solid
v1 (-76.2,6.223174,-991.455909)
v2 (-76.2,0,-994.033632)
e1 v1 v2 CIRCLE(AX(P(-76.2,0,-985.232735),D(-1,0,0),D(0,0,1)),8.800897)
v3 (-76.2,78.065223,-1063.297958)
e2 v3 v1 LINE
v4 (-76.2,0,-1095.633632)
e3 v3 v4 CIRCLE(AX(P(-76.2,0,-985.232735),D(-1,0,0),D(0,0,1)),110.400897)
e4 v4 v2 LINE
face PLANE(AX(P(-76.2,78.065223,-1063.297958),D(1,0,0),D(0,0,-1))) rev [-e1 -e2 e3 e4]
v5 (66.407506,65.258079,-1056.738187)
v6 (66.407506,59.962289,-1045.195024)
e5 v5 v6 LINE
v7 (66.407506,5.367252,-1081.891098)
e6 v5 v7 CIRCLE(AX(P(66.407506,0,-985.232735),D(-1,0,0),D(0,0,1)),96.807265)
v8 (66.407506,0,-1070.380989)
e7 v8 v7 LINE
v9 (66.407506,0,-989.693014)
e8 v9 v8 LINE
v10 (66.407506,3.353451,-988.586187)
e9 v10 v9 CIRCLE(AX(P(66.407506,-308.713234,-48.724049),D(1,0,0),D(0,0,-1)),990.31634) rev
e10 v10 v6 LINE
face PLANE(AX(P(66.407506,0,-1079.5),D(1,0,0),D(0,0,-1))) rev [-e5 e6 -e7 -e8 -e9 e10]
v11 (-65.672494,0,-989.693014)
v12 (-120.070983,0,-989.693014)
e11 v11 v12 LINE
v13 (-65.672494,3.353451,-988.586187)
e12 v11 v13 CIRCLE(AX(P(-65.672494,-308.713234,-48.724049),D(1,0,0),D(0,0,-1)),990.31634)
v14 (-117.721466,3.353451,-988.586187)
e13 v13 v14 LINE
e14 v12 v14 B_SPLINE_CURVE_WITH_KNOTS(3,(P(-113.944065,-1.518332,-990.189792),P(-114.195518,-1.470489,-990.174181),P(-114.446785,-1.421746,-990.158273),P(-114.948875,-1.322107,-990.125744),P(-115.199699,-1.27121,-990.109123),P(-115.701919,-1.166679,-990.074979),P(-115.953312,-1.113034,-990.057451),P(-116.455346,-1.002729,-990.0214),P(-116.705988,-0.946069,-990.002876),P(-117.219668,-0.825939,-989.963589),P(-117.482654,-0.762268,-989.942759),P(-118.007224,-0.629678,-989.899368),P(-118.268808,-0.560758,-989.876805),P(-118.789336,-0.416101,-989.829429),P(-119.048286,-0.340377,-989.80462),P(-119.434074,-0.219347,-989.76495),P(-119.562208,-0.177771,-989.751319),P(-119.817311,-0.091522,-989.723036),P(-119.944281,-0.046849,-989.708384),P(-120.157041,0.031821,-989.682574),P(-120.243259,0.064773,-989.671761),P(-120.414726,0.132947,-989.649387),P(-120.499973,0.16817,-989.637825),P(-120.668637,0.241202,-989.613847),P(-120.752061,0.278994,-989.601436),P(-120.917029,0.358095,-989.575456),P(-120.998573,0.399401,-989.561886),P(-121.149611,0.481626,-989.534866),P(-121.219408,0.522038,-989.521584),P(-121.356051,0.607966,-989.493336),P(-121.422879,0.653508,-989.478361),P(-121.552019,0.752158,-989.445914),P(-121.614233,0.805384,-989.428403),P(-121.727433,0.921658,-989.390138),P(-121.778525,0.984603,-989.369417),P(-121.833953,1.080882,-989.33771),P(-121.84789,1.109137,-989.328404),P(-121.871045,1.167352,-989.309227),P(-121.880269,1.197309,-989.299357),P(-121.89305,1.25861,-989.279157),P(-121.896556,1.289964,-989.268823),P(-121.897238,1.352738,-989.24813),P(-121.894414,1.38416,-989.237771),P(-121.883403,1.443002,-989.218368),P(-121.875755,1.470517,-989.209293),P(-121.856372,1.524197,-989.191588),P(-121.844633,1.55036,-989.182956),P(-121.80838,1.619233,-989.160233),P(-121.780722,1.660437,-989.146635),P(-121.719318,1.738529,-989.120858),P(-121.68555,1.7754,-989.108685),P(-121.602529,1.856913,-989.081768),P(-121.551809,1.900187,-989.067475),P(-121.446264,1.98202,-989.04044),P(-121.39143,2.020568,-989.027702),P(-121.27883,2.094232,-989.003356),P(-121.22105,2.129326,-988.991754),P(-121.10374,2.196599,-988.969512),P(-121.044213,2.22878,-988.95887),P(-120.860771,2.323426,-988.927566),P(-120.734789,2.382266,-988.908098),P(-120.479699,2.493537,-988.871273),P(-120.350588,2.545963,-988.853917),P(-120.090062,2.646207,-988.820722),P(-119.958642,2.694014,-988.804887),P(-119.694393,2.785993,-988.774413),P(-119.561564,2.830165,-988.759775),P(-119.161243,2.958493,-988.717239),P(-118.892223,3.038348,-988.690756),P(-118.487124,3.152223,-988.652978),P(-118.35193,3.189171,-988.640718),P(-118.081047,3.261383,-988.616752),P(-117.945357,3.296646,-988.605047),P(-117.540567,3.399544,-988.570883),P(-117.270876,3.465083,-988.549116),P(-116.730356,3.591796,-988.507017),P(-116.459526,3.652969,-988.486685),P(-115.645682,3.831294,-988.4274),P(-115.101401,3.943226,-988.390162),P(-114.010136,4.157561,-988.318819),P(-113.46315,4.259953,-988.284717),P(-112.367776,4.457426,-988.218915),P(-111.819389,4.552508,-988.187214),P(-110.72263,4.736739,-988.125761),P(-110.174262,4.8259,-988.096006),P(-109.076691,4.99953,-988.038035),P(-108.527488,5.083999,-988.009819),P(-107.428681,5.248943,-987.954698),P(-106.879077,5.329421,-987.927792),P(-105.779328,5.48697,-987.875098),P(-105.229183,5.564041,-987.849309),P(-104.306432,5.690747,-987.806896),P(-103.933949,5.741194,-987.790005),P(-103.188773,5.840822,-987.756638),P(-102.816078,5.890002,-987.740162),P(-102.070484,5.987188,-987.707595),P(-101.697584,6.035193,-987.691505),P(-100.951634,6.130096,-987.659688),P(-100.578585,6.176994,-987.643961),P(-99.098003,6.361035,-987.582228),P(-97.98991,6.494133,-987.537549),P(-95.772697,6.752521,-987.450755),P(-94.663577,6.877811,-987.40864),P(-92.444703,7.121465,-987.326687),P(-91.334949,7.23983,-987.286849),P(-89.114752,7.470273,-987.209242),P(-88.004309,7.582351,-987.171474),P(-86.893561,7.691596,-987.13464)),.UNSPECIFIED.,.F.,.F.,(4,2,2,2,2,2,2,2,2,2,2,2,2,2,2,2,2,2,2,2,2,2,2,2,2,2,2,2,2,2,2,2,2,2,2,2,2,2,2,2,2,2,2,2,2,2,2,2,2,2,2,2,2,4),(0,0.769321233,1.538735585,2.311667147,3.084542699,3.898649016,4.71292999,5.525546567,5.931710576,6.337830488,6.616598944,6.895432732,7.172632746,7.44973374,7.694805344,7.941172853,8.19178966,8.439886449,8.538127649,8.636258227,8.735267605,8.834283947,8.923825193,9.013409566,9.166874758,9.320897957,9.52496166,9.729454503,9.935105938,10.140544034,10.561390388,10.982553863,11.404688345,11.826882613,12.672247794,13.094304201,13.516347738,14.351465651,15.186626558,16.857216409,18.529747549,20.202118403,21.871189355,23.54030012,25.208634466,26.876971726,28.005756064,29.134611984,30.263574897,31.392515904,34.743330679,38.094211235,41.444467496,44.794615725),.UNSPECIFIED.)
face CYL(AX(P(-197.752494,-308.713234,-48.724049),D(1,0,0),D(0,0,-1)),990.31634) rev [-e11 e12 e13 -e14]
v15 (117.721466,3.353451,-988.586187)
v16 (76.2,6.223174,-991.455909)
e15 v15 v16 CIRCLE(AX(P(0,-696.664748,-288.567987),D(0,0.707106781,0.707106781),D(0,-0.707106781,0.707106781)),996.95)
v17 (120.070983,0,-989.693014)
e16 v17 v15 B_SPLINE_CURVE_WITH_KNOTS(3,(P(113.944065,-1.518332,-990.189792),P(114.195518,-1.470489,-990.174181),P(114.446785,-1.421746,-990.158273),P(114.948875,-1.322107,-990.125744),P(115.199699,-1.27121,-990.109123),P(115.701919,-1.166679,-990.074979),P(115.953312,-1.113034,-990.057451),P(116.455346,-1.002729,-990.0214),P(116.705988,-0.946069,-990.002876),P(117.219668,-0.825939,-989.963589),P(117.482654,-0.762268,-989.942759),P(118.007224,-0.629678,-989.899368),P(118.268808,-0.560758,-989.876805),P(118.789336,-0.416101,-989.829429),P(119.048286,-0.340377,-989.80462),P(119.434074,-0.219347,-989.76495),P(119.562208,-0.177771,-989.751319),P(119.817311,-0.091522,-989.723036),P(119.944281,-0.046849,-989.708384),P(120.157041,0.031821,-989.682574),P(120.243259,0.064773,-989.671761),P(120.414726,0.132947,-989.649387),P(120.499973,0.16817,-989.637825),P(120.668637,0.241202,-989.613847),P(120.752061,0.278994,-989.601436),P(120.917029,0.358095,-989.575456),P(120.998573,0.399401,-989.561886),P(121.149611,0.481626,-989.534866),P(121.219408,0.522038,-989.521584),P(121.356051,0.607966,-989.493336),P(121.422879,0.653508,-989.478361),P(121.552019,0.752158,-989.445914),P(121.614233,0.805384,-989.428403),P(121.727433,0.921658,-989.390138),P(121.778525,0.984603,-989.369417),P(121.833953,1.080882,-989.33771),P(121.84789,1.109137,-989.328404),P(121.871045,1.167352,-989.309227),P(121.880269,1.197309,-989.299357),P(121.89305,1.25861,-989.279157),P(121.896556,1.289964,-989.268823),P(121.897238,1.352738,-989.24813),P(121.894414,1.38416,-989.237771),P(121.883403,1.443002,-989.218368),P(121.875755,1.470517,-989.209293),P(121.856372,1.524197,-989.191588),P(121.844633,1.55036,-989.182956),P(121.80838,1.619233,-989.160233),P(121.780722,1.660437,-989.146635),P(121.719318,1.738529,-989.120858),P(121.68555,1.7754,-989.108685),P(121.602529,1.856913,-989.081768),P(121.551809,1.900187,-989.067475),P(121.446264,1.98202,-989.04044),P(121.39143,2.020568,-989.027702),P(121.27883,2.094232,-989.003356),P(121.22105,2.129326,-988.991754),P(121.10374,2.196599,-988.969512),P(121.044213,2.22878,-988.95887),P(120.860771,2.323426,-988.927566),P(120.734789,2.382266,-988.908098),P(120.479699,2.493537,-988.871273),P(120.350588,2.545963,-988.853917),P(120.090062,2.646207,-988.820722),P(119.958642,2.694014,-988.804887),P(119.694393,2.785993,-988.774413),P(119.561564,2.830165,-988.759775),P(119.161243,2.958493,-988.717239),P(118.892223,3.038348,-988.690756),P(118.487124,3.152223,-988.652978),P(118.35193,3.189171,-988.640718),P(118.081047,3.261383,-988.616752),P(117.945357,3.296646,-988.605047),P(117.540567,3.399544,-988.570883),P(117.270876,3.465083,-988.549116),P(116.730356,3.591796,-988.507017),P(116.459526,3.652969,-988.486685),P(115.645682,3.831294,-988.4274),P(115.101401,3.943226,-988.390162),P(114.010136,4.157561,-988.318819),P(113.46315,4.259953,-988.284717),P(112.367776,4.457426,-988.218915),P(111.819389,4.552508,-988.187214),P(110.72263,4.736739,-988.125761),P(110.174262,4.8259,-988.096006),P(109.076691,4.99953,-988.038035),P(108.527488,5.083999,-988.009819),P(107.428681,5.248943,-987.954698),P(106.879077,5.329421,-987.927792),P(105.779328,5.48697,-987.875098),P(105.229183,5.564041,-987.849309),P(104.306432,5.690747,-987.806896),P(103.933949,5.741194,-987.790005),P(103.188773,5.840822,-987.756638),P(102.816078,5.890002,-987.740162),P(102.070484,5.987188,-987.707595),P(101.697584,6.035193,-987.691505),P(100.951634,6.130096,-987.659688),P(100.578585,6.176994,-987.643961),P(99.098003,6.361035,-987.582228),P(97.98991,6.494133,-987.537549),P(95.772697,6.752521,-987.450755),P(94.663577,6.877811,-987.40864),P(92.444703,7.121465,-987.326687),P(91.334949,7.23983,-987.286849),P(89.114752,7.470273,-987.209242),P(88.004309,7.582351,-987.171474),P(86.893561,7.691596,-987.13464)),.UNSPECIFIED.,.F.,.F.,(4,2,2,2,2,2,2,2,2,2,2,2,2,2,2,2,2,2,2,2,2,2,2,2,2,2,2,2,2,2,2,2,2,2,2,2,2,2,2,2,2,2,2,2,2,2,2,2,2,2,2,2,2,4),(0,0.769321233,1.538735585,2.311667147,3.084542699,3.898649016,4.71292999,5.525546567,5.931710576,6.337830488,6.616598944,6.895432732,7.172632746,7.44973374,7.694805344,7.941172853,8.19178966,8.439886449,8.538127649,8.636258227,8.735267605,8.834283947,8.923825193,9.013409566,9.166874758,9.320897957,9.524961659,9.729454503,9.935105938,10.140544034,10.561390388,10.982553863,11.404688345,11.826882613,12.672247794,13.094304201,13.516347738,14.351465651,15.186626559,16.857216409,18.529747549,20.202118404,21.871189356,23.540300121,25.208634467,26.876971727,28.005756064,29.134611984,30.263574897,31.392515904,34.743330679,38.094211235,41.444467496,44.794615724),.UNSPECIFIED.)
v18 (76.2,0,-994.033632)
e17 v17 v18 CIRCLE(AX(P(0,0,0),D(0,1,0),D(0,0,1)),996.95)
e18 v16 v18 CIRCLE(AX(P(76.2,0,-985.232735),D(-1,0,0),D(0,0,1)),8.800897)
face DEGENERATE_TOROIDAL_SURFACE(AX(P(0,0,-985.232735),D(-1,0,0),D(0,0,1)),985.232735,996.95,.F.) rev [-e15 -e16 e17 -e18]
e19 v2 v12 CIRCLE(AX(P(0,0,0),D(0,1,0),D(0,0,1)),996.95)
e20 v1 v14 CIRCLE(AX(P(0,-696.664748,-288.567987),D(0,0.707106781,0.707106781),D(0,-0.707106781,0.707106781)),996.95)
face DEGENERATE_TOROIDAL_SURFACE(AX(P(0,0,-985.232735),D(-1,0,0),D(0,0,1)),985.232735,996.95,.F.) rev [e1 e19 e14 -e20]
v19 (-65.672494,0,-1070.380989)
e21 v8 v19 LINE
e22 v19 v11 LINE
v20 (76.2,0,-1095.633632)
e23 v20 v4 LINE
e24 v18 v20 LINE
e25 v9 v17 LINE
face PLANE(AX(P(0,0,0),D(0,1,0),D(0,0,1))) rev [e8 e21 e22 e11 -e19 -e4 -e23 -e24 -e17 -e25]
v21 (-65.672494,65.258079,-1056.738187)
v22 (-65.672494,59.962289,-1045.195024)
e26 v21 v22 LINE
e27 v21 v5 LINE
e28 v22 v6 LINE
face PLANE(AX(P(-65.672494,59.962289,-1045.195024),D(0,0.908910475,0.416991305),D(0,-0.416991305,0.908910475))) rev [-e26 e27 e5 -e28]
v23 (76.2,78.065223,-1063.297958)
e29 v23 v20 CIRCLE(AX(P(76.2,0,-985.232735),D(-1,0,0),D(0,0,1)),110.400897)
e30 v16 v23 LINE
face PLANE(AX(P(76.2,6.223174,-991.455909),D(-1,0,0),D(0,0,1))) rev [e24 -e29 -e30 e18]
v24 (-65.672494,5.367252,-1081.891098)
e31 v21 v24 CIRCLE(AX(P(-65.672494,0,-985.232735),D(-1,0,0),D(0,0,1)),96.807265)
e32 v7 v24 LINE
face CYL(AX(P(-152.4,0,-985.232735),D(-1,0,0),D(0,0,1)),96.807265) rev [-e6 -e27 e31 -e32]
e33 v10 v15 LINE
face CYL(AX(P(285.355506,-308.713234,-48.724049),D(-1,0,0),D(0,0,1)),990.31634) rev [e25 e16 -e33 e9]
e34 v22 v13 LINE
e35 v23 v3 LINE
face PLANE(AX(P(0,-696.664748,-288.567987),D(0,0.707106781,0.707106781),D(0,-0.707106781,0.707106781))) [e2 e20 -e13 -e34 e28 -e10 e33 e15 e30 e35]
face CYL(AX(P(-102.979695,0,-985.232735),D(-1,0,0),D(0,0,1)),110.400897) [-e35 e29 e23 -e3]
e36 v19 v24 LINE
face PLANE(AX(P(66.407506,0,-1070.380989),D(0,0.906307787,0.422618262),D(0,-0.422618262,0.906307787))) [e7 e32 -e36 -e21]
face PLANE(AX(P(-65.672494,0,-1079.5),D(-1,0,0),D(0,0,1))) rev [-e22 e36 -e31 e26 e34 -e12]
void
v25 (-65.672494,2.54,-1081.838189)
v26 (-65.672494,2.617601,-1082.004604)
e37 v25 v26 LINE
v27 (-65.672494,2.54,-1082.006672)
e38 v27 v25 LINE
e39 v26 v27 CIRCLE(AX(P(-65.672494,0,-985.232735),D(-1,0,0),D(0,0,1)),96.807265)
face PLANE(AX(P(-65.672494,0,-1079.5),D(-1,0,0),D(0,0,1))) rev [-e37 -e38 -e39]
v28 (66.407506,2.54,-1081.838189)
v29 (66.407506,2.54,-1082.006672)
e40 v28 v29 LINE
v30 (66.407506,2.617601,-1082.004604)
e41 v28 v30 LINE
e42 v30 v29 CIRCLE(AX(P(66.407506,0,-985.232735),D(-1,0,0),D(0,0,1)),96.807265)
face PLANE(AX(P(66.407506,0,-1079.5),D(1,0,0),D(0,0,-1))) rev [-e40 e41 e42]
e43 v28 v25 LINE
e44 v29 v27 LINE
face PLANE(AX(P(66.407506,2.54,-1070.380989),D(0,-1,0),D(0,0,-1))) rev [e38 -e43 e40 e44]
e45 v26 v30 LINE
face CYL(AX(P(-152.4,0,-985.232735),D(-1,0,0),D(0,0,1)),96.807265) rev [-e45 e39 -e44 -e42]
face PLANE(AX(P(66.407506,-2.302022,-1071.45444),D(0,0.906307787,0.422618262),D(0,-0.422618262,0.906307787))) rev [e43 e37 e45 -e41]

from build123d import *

# Parameters (mm, degrees)
REVOLVE1_ANGLE            = 45
CUT_REVOLVE_THIN3_START   = -65.672494398
CUT_REVOLVE_THIN3_DEPTH   = 132.08
CUT_REVOLVE_THIN3_START_2 = 59.247024
CUT_REVOLVE_THIN3_2_DEPTH = 7.160481602
EXTRUDE_THIN1_DEPTH       = 132.08
BOSS_EXTRUDE1_START       = 132.08
BOSS_EXTRUDE1_DEPTH       = 132.08
SKETCH12_R                = 990.316340453
CUT_EXTRUDE1_DEPTH        = 132.08
SKETCH14_W                = 3.086900102
SKETCH14_H                = 1.742063617
CUT_EXTRUDE5_DEPTH        = 2.54
SKETCH16_R                = 990.316340453
CUT_EXTRUDE6_DEPTH        = 351.028


# Read off the part's stored shape, not the designer's step: Cut-Revolve-Thin3
with BuildPart() as part:
    # Sketch1 → Revolve1 (revolve)
    with BuildSketch(Plane(origin=(0, 0, 0), x_dir=(1, 0, 0), z_dir=(0, 1, 0))):
        with BuildLine():
            Line((76.2, 994.033632479), (76.2, 1095.633632479))
            Line((76.2, 1095.633632479), (-76.2, 1095.633632479))
            Line((-76.2, 1095.633632479), (-76.2, 994.033632479))
            ThreePointArc((-76.2, 994.033632479), (-114.384675321, 990.366320384), (-152.4, 985.232735195))
            Line((-152.4, 985.232735195), (-102.9796946, 985.232735195))
            ThreePointArc((-102.9796946, 985.232735195), (0, 990.6), (102.9796946, 985.232735195))
            Line((102.9796946, 985.232735195), (152.4, 985.232735195))
            ThreePointArc((152.4, 985.232735195), (114.384675321, 990.366320384), (76.2, 994.033632479))
        make_face()
    revolve(axis=Axis((-102.9796946, 0, -985.232735195), (1, 0, 0)), revolution_arc=REVOLVE1_ANGLE)

    # Cut-Revolve-Thin3 outline → Cut-Revolve-Thin3 (cut)
    with BuildSketch(Plane.YZ.offset(CUT_REVOLVE_THIN3_START)):
        with BuildLine():
            ThreePointArc((0, -1082.04), (37.046536374, -1074.670985747), (68.453073412, -1053.685808607))
            Line((68.453073412, -1053.685808607), (2.371248163, -987.603983358))
            ThreePointArc((2.371248163, -987.603983358), (1.283310258, -988.330920225), (0, -988.586186506))
            Line((0, -988.586186506), (0, -1082.04))
        make_face()
    extrude(amount=CUT_REVOLVE_THIN3_DEPTH, mode=Mode.SUBTRACT)

    # Cut-Revolve-Thin3 2 outline → Cut-Revolve-Thin3 2 (cut)
    with BuildSketch(Plane.YZ.offset(CUT_REVOLVE_THIN3_START_2)):
        with BuildLine():
            ThreePointArc((0, -988.586186506), (1.283310258, -988.330920225), (2.371248163, -987.603983358))
            Line((2.371248163, -987.603983358), (2.337863382, -987.570598578))
            ThreePointArc((2.337863382, -987.570598578), (1.265242545, -988.287300908), (0, -988.538973298))
            Line((0, -988.538973298), (0, -988.586186506))
        make_face()
    extrude(amount=CUT_REVOLVE_THIN3_2_DEPTH, mode=Mode.SUBTRACT)

    # Sketch5 → Extrude-Thin1 (add)
    with BuildSketch(Plane(origin=(-65.672494398, 0, 0), x_dir=(0, 0, -1), z_dir=(1, 0, 0))):
        Polygon((1082.04, 0), (1070.380989237, 0), (1081.891098133, 5.367251924), (1082.964548518, 3.065230145), (1081.838188837, 2.54), (1082.04, 2.54), align=None)
    extrude(amount=EXTRUDE_THIN1_DEPTH)

    # Sketch11 → Boss-Extrude1 (add)
    with BuildSketch(Plane.ZY.offset(-66.407505602).offset(BOSS_EXTRUDE1_START)):
        with BuildLine():
            Line((-1053.685808607, 68.453073412), (-1045.195024303, 59.962289107))
            Line((-1045.195024303, 59.962289107), (-1056.738187334, 65.258078683))
            ThreePointArc((-1056.738187334, 65.258078683), (-1055.230229553, 66.872993821), (-1053.685808607, 68.453073412))
        make_face()
    extrude(amount=-BOSS_EXTRUDE1_DEPTH)

    # Sketch12 → Cut-Extrude1 (cut)
    with BuildSketch(Plane(origin=(-65.672494398, 0, 0), x_dir=(0, 0, -1), z_dir=(1, 0, 0))):
        with Locations((48.724048718, -308.713234064)):
            Circle(SKETCH12_R)
    extrude(amount=-CUT_EXTRUDE1_DEPTH, mode=Mode.SUBTRACT)


with BuildPart() as cut_extrude1_piece_1:
    # of the separate pieces the step leaves, piece 1, a body of its own (cut_extrude1_pieces)
    add(part.part.solids().sort_by_distance((152.4, 0, -985.232735195))[0])

    # Sketch16 → Cut-Extrude6 (cut)
    with BuildSketch(Plane(origin=(-65.672494398, 0, 0), x_dir=(0, 0, -1), z_dir=(1, 0, 0))):
        with Locations((48.724048718, -308.713234064)):
            Circle(SKETCH16_R)
    extrude(amount=CUT_EXTRUDE6_DEPTH, mode=Mode.SUBTRACT)


with BuildPart() as cut_extrude1_piece_2:
    # of the separate pieces the step leaves, piece 2, a body of its own (cut_extrude1_pieces)
    add(part.part.solids().sort_by_distance((-65.672494398, 0, -988.586186506))[0])

    # Sketch14 → Cut-Extrude5 (cut)
    with BuildSketch(Plane.XZ):
        with Locations((-64.129044347, -987.715154698)):
            Rectangle(SKETCH14_W, SKETCH14_H)
    extrude(amount=-CUT_EXTRUDE5_DEPTH, mode=Mode.SUBTRACT)


solid = cut_extrude1_piece_1.part
